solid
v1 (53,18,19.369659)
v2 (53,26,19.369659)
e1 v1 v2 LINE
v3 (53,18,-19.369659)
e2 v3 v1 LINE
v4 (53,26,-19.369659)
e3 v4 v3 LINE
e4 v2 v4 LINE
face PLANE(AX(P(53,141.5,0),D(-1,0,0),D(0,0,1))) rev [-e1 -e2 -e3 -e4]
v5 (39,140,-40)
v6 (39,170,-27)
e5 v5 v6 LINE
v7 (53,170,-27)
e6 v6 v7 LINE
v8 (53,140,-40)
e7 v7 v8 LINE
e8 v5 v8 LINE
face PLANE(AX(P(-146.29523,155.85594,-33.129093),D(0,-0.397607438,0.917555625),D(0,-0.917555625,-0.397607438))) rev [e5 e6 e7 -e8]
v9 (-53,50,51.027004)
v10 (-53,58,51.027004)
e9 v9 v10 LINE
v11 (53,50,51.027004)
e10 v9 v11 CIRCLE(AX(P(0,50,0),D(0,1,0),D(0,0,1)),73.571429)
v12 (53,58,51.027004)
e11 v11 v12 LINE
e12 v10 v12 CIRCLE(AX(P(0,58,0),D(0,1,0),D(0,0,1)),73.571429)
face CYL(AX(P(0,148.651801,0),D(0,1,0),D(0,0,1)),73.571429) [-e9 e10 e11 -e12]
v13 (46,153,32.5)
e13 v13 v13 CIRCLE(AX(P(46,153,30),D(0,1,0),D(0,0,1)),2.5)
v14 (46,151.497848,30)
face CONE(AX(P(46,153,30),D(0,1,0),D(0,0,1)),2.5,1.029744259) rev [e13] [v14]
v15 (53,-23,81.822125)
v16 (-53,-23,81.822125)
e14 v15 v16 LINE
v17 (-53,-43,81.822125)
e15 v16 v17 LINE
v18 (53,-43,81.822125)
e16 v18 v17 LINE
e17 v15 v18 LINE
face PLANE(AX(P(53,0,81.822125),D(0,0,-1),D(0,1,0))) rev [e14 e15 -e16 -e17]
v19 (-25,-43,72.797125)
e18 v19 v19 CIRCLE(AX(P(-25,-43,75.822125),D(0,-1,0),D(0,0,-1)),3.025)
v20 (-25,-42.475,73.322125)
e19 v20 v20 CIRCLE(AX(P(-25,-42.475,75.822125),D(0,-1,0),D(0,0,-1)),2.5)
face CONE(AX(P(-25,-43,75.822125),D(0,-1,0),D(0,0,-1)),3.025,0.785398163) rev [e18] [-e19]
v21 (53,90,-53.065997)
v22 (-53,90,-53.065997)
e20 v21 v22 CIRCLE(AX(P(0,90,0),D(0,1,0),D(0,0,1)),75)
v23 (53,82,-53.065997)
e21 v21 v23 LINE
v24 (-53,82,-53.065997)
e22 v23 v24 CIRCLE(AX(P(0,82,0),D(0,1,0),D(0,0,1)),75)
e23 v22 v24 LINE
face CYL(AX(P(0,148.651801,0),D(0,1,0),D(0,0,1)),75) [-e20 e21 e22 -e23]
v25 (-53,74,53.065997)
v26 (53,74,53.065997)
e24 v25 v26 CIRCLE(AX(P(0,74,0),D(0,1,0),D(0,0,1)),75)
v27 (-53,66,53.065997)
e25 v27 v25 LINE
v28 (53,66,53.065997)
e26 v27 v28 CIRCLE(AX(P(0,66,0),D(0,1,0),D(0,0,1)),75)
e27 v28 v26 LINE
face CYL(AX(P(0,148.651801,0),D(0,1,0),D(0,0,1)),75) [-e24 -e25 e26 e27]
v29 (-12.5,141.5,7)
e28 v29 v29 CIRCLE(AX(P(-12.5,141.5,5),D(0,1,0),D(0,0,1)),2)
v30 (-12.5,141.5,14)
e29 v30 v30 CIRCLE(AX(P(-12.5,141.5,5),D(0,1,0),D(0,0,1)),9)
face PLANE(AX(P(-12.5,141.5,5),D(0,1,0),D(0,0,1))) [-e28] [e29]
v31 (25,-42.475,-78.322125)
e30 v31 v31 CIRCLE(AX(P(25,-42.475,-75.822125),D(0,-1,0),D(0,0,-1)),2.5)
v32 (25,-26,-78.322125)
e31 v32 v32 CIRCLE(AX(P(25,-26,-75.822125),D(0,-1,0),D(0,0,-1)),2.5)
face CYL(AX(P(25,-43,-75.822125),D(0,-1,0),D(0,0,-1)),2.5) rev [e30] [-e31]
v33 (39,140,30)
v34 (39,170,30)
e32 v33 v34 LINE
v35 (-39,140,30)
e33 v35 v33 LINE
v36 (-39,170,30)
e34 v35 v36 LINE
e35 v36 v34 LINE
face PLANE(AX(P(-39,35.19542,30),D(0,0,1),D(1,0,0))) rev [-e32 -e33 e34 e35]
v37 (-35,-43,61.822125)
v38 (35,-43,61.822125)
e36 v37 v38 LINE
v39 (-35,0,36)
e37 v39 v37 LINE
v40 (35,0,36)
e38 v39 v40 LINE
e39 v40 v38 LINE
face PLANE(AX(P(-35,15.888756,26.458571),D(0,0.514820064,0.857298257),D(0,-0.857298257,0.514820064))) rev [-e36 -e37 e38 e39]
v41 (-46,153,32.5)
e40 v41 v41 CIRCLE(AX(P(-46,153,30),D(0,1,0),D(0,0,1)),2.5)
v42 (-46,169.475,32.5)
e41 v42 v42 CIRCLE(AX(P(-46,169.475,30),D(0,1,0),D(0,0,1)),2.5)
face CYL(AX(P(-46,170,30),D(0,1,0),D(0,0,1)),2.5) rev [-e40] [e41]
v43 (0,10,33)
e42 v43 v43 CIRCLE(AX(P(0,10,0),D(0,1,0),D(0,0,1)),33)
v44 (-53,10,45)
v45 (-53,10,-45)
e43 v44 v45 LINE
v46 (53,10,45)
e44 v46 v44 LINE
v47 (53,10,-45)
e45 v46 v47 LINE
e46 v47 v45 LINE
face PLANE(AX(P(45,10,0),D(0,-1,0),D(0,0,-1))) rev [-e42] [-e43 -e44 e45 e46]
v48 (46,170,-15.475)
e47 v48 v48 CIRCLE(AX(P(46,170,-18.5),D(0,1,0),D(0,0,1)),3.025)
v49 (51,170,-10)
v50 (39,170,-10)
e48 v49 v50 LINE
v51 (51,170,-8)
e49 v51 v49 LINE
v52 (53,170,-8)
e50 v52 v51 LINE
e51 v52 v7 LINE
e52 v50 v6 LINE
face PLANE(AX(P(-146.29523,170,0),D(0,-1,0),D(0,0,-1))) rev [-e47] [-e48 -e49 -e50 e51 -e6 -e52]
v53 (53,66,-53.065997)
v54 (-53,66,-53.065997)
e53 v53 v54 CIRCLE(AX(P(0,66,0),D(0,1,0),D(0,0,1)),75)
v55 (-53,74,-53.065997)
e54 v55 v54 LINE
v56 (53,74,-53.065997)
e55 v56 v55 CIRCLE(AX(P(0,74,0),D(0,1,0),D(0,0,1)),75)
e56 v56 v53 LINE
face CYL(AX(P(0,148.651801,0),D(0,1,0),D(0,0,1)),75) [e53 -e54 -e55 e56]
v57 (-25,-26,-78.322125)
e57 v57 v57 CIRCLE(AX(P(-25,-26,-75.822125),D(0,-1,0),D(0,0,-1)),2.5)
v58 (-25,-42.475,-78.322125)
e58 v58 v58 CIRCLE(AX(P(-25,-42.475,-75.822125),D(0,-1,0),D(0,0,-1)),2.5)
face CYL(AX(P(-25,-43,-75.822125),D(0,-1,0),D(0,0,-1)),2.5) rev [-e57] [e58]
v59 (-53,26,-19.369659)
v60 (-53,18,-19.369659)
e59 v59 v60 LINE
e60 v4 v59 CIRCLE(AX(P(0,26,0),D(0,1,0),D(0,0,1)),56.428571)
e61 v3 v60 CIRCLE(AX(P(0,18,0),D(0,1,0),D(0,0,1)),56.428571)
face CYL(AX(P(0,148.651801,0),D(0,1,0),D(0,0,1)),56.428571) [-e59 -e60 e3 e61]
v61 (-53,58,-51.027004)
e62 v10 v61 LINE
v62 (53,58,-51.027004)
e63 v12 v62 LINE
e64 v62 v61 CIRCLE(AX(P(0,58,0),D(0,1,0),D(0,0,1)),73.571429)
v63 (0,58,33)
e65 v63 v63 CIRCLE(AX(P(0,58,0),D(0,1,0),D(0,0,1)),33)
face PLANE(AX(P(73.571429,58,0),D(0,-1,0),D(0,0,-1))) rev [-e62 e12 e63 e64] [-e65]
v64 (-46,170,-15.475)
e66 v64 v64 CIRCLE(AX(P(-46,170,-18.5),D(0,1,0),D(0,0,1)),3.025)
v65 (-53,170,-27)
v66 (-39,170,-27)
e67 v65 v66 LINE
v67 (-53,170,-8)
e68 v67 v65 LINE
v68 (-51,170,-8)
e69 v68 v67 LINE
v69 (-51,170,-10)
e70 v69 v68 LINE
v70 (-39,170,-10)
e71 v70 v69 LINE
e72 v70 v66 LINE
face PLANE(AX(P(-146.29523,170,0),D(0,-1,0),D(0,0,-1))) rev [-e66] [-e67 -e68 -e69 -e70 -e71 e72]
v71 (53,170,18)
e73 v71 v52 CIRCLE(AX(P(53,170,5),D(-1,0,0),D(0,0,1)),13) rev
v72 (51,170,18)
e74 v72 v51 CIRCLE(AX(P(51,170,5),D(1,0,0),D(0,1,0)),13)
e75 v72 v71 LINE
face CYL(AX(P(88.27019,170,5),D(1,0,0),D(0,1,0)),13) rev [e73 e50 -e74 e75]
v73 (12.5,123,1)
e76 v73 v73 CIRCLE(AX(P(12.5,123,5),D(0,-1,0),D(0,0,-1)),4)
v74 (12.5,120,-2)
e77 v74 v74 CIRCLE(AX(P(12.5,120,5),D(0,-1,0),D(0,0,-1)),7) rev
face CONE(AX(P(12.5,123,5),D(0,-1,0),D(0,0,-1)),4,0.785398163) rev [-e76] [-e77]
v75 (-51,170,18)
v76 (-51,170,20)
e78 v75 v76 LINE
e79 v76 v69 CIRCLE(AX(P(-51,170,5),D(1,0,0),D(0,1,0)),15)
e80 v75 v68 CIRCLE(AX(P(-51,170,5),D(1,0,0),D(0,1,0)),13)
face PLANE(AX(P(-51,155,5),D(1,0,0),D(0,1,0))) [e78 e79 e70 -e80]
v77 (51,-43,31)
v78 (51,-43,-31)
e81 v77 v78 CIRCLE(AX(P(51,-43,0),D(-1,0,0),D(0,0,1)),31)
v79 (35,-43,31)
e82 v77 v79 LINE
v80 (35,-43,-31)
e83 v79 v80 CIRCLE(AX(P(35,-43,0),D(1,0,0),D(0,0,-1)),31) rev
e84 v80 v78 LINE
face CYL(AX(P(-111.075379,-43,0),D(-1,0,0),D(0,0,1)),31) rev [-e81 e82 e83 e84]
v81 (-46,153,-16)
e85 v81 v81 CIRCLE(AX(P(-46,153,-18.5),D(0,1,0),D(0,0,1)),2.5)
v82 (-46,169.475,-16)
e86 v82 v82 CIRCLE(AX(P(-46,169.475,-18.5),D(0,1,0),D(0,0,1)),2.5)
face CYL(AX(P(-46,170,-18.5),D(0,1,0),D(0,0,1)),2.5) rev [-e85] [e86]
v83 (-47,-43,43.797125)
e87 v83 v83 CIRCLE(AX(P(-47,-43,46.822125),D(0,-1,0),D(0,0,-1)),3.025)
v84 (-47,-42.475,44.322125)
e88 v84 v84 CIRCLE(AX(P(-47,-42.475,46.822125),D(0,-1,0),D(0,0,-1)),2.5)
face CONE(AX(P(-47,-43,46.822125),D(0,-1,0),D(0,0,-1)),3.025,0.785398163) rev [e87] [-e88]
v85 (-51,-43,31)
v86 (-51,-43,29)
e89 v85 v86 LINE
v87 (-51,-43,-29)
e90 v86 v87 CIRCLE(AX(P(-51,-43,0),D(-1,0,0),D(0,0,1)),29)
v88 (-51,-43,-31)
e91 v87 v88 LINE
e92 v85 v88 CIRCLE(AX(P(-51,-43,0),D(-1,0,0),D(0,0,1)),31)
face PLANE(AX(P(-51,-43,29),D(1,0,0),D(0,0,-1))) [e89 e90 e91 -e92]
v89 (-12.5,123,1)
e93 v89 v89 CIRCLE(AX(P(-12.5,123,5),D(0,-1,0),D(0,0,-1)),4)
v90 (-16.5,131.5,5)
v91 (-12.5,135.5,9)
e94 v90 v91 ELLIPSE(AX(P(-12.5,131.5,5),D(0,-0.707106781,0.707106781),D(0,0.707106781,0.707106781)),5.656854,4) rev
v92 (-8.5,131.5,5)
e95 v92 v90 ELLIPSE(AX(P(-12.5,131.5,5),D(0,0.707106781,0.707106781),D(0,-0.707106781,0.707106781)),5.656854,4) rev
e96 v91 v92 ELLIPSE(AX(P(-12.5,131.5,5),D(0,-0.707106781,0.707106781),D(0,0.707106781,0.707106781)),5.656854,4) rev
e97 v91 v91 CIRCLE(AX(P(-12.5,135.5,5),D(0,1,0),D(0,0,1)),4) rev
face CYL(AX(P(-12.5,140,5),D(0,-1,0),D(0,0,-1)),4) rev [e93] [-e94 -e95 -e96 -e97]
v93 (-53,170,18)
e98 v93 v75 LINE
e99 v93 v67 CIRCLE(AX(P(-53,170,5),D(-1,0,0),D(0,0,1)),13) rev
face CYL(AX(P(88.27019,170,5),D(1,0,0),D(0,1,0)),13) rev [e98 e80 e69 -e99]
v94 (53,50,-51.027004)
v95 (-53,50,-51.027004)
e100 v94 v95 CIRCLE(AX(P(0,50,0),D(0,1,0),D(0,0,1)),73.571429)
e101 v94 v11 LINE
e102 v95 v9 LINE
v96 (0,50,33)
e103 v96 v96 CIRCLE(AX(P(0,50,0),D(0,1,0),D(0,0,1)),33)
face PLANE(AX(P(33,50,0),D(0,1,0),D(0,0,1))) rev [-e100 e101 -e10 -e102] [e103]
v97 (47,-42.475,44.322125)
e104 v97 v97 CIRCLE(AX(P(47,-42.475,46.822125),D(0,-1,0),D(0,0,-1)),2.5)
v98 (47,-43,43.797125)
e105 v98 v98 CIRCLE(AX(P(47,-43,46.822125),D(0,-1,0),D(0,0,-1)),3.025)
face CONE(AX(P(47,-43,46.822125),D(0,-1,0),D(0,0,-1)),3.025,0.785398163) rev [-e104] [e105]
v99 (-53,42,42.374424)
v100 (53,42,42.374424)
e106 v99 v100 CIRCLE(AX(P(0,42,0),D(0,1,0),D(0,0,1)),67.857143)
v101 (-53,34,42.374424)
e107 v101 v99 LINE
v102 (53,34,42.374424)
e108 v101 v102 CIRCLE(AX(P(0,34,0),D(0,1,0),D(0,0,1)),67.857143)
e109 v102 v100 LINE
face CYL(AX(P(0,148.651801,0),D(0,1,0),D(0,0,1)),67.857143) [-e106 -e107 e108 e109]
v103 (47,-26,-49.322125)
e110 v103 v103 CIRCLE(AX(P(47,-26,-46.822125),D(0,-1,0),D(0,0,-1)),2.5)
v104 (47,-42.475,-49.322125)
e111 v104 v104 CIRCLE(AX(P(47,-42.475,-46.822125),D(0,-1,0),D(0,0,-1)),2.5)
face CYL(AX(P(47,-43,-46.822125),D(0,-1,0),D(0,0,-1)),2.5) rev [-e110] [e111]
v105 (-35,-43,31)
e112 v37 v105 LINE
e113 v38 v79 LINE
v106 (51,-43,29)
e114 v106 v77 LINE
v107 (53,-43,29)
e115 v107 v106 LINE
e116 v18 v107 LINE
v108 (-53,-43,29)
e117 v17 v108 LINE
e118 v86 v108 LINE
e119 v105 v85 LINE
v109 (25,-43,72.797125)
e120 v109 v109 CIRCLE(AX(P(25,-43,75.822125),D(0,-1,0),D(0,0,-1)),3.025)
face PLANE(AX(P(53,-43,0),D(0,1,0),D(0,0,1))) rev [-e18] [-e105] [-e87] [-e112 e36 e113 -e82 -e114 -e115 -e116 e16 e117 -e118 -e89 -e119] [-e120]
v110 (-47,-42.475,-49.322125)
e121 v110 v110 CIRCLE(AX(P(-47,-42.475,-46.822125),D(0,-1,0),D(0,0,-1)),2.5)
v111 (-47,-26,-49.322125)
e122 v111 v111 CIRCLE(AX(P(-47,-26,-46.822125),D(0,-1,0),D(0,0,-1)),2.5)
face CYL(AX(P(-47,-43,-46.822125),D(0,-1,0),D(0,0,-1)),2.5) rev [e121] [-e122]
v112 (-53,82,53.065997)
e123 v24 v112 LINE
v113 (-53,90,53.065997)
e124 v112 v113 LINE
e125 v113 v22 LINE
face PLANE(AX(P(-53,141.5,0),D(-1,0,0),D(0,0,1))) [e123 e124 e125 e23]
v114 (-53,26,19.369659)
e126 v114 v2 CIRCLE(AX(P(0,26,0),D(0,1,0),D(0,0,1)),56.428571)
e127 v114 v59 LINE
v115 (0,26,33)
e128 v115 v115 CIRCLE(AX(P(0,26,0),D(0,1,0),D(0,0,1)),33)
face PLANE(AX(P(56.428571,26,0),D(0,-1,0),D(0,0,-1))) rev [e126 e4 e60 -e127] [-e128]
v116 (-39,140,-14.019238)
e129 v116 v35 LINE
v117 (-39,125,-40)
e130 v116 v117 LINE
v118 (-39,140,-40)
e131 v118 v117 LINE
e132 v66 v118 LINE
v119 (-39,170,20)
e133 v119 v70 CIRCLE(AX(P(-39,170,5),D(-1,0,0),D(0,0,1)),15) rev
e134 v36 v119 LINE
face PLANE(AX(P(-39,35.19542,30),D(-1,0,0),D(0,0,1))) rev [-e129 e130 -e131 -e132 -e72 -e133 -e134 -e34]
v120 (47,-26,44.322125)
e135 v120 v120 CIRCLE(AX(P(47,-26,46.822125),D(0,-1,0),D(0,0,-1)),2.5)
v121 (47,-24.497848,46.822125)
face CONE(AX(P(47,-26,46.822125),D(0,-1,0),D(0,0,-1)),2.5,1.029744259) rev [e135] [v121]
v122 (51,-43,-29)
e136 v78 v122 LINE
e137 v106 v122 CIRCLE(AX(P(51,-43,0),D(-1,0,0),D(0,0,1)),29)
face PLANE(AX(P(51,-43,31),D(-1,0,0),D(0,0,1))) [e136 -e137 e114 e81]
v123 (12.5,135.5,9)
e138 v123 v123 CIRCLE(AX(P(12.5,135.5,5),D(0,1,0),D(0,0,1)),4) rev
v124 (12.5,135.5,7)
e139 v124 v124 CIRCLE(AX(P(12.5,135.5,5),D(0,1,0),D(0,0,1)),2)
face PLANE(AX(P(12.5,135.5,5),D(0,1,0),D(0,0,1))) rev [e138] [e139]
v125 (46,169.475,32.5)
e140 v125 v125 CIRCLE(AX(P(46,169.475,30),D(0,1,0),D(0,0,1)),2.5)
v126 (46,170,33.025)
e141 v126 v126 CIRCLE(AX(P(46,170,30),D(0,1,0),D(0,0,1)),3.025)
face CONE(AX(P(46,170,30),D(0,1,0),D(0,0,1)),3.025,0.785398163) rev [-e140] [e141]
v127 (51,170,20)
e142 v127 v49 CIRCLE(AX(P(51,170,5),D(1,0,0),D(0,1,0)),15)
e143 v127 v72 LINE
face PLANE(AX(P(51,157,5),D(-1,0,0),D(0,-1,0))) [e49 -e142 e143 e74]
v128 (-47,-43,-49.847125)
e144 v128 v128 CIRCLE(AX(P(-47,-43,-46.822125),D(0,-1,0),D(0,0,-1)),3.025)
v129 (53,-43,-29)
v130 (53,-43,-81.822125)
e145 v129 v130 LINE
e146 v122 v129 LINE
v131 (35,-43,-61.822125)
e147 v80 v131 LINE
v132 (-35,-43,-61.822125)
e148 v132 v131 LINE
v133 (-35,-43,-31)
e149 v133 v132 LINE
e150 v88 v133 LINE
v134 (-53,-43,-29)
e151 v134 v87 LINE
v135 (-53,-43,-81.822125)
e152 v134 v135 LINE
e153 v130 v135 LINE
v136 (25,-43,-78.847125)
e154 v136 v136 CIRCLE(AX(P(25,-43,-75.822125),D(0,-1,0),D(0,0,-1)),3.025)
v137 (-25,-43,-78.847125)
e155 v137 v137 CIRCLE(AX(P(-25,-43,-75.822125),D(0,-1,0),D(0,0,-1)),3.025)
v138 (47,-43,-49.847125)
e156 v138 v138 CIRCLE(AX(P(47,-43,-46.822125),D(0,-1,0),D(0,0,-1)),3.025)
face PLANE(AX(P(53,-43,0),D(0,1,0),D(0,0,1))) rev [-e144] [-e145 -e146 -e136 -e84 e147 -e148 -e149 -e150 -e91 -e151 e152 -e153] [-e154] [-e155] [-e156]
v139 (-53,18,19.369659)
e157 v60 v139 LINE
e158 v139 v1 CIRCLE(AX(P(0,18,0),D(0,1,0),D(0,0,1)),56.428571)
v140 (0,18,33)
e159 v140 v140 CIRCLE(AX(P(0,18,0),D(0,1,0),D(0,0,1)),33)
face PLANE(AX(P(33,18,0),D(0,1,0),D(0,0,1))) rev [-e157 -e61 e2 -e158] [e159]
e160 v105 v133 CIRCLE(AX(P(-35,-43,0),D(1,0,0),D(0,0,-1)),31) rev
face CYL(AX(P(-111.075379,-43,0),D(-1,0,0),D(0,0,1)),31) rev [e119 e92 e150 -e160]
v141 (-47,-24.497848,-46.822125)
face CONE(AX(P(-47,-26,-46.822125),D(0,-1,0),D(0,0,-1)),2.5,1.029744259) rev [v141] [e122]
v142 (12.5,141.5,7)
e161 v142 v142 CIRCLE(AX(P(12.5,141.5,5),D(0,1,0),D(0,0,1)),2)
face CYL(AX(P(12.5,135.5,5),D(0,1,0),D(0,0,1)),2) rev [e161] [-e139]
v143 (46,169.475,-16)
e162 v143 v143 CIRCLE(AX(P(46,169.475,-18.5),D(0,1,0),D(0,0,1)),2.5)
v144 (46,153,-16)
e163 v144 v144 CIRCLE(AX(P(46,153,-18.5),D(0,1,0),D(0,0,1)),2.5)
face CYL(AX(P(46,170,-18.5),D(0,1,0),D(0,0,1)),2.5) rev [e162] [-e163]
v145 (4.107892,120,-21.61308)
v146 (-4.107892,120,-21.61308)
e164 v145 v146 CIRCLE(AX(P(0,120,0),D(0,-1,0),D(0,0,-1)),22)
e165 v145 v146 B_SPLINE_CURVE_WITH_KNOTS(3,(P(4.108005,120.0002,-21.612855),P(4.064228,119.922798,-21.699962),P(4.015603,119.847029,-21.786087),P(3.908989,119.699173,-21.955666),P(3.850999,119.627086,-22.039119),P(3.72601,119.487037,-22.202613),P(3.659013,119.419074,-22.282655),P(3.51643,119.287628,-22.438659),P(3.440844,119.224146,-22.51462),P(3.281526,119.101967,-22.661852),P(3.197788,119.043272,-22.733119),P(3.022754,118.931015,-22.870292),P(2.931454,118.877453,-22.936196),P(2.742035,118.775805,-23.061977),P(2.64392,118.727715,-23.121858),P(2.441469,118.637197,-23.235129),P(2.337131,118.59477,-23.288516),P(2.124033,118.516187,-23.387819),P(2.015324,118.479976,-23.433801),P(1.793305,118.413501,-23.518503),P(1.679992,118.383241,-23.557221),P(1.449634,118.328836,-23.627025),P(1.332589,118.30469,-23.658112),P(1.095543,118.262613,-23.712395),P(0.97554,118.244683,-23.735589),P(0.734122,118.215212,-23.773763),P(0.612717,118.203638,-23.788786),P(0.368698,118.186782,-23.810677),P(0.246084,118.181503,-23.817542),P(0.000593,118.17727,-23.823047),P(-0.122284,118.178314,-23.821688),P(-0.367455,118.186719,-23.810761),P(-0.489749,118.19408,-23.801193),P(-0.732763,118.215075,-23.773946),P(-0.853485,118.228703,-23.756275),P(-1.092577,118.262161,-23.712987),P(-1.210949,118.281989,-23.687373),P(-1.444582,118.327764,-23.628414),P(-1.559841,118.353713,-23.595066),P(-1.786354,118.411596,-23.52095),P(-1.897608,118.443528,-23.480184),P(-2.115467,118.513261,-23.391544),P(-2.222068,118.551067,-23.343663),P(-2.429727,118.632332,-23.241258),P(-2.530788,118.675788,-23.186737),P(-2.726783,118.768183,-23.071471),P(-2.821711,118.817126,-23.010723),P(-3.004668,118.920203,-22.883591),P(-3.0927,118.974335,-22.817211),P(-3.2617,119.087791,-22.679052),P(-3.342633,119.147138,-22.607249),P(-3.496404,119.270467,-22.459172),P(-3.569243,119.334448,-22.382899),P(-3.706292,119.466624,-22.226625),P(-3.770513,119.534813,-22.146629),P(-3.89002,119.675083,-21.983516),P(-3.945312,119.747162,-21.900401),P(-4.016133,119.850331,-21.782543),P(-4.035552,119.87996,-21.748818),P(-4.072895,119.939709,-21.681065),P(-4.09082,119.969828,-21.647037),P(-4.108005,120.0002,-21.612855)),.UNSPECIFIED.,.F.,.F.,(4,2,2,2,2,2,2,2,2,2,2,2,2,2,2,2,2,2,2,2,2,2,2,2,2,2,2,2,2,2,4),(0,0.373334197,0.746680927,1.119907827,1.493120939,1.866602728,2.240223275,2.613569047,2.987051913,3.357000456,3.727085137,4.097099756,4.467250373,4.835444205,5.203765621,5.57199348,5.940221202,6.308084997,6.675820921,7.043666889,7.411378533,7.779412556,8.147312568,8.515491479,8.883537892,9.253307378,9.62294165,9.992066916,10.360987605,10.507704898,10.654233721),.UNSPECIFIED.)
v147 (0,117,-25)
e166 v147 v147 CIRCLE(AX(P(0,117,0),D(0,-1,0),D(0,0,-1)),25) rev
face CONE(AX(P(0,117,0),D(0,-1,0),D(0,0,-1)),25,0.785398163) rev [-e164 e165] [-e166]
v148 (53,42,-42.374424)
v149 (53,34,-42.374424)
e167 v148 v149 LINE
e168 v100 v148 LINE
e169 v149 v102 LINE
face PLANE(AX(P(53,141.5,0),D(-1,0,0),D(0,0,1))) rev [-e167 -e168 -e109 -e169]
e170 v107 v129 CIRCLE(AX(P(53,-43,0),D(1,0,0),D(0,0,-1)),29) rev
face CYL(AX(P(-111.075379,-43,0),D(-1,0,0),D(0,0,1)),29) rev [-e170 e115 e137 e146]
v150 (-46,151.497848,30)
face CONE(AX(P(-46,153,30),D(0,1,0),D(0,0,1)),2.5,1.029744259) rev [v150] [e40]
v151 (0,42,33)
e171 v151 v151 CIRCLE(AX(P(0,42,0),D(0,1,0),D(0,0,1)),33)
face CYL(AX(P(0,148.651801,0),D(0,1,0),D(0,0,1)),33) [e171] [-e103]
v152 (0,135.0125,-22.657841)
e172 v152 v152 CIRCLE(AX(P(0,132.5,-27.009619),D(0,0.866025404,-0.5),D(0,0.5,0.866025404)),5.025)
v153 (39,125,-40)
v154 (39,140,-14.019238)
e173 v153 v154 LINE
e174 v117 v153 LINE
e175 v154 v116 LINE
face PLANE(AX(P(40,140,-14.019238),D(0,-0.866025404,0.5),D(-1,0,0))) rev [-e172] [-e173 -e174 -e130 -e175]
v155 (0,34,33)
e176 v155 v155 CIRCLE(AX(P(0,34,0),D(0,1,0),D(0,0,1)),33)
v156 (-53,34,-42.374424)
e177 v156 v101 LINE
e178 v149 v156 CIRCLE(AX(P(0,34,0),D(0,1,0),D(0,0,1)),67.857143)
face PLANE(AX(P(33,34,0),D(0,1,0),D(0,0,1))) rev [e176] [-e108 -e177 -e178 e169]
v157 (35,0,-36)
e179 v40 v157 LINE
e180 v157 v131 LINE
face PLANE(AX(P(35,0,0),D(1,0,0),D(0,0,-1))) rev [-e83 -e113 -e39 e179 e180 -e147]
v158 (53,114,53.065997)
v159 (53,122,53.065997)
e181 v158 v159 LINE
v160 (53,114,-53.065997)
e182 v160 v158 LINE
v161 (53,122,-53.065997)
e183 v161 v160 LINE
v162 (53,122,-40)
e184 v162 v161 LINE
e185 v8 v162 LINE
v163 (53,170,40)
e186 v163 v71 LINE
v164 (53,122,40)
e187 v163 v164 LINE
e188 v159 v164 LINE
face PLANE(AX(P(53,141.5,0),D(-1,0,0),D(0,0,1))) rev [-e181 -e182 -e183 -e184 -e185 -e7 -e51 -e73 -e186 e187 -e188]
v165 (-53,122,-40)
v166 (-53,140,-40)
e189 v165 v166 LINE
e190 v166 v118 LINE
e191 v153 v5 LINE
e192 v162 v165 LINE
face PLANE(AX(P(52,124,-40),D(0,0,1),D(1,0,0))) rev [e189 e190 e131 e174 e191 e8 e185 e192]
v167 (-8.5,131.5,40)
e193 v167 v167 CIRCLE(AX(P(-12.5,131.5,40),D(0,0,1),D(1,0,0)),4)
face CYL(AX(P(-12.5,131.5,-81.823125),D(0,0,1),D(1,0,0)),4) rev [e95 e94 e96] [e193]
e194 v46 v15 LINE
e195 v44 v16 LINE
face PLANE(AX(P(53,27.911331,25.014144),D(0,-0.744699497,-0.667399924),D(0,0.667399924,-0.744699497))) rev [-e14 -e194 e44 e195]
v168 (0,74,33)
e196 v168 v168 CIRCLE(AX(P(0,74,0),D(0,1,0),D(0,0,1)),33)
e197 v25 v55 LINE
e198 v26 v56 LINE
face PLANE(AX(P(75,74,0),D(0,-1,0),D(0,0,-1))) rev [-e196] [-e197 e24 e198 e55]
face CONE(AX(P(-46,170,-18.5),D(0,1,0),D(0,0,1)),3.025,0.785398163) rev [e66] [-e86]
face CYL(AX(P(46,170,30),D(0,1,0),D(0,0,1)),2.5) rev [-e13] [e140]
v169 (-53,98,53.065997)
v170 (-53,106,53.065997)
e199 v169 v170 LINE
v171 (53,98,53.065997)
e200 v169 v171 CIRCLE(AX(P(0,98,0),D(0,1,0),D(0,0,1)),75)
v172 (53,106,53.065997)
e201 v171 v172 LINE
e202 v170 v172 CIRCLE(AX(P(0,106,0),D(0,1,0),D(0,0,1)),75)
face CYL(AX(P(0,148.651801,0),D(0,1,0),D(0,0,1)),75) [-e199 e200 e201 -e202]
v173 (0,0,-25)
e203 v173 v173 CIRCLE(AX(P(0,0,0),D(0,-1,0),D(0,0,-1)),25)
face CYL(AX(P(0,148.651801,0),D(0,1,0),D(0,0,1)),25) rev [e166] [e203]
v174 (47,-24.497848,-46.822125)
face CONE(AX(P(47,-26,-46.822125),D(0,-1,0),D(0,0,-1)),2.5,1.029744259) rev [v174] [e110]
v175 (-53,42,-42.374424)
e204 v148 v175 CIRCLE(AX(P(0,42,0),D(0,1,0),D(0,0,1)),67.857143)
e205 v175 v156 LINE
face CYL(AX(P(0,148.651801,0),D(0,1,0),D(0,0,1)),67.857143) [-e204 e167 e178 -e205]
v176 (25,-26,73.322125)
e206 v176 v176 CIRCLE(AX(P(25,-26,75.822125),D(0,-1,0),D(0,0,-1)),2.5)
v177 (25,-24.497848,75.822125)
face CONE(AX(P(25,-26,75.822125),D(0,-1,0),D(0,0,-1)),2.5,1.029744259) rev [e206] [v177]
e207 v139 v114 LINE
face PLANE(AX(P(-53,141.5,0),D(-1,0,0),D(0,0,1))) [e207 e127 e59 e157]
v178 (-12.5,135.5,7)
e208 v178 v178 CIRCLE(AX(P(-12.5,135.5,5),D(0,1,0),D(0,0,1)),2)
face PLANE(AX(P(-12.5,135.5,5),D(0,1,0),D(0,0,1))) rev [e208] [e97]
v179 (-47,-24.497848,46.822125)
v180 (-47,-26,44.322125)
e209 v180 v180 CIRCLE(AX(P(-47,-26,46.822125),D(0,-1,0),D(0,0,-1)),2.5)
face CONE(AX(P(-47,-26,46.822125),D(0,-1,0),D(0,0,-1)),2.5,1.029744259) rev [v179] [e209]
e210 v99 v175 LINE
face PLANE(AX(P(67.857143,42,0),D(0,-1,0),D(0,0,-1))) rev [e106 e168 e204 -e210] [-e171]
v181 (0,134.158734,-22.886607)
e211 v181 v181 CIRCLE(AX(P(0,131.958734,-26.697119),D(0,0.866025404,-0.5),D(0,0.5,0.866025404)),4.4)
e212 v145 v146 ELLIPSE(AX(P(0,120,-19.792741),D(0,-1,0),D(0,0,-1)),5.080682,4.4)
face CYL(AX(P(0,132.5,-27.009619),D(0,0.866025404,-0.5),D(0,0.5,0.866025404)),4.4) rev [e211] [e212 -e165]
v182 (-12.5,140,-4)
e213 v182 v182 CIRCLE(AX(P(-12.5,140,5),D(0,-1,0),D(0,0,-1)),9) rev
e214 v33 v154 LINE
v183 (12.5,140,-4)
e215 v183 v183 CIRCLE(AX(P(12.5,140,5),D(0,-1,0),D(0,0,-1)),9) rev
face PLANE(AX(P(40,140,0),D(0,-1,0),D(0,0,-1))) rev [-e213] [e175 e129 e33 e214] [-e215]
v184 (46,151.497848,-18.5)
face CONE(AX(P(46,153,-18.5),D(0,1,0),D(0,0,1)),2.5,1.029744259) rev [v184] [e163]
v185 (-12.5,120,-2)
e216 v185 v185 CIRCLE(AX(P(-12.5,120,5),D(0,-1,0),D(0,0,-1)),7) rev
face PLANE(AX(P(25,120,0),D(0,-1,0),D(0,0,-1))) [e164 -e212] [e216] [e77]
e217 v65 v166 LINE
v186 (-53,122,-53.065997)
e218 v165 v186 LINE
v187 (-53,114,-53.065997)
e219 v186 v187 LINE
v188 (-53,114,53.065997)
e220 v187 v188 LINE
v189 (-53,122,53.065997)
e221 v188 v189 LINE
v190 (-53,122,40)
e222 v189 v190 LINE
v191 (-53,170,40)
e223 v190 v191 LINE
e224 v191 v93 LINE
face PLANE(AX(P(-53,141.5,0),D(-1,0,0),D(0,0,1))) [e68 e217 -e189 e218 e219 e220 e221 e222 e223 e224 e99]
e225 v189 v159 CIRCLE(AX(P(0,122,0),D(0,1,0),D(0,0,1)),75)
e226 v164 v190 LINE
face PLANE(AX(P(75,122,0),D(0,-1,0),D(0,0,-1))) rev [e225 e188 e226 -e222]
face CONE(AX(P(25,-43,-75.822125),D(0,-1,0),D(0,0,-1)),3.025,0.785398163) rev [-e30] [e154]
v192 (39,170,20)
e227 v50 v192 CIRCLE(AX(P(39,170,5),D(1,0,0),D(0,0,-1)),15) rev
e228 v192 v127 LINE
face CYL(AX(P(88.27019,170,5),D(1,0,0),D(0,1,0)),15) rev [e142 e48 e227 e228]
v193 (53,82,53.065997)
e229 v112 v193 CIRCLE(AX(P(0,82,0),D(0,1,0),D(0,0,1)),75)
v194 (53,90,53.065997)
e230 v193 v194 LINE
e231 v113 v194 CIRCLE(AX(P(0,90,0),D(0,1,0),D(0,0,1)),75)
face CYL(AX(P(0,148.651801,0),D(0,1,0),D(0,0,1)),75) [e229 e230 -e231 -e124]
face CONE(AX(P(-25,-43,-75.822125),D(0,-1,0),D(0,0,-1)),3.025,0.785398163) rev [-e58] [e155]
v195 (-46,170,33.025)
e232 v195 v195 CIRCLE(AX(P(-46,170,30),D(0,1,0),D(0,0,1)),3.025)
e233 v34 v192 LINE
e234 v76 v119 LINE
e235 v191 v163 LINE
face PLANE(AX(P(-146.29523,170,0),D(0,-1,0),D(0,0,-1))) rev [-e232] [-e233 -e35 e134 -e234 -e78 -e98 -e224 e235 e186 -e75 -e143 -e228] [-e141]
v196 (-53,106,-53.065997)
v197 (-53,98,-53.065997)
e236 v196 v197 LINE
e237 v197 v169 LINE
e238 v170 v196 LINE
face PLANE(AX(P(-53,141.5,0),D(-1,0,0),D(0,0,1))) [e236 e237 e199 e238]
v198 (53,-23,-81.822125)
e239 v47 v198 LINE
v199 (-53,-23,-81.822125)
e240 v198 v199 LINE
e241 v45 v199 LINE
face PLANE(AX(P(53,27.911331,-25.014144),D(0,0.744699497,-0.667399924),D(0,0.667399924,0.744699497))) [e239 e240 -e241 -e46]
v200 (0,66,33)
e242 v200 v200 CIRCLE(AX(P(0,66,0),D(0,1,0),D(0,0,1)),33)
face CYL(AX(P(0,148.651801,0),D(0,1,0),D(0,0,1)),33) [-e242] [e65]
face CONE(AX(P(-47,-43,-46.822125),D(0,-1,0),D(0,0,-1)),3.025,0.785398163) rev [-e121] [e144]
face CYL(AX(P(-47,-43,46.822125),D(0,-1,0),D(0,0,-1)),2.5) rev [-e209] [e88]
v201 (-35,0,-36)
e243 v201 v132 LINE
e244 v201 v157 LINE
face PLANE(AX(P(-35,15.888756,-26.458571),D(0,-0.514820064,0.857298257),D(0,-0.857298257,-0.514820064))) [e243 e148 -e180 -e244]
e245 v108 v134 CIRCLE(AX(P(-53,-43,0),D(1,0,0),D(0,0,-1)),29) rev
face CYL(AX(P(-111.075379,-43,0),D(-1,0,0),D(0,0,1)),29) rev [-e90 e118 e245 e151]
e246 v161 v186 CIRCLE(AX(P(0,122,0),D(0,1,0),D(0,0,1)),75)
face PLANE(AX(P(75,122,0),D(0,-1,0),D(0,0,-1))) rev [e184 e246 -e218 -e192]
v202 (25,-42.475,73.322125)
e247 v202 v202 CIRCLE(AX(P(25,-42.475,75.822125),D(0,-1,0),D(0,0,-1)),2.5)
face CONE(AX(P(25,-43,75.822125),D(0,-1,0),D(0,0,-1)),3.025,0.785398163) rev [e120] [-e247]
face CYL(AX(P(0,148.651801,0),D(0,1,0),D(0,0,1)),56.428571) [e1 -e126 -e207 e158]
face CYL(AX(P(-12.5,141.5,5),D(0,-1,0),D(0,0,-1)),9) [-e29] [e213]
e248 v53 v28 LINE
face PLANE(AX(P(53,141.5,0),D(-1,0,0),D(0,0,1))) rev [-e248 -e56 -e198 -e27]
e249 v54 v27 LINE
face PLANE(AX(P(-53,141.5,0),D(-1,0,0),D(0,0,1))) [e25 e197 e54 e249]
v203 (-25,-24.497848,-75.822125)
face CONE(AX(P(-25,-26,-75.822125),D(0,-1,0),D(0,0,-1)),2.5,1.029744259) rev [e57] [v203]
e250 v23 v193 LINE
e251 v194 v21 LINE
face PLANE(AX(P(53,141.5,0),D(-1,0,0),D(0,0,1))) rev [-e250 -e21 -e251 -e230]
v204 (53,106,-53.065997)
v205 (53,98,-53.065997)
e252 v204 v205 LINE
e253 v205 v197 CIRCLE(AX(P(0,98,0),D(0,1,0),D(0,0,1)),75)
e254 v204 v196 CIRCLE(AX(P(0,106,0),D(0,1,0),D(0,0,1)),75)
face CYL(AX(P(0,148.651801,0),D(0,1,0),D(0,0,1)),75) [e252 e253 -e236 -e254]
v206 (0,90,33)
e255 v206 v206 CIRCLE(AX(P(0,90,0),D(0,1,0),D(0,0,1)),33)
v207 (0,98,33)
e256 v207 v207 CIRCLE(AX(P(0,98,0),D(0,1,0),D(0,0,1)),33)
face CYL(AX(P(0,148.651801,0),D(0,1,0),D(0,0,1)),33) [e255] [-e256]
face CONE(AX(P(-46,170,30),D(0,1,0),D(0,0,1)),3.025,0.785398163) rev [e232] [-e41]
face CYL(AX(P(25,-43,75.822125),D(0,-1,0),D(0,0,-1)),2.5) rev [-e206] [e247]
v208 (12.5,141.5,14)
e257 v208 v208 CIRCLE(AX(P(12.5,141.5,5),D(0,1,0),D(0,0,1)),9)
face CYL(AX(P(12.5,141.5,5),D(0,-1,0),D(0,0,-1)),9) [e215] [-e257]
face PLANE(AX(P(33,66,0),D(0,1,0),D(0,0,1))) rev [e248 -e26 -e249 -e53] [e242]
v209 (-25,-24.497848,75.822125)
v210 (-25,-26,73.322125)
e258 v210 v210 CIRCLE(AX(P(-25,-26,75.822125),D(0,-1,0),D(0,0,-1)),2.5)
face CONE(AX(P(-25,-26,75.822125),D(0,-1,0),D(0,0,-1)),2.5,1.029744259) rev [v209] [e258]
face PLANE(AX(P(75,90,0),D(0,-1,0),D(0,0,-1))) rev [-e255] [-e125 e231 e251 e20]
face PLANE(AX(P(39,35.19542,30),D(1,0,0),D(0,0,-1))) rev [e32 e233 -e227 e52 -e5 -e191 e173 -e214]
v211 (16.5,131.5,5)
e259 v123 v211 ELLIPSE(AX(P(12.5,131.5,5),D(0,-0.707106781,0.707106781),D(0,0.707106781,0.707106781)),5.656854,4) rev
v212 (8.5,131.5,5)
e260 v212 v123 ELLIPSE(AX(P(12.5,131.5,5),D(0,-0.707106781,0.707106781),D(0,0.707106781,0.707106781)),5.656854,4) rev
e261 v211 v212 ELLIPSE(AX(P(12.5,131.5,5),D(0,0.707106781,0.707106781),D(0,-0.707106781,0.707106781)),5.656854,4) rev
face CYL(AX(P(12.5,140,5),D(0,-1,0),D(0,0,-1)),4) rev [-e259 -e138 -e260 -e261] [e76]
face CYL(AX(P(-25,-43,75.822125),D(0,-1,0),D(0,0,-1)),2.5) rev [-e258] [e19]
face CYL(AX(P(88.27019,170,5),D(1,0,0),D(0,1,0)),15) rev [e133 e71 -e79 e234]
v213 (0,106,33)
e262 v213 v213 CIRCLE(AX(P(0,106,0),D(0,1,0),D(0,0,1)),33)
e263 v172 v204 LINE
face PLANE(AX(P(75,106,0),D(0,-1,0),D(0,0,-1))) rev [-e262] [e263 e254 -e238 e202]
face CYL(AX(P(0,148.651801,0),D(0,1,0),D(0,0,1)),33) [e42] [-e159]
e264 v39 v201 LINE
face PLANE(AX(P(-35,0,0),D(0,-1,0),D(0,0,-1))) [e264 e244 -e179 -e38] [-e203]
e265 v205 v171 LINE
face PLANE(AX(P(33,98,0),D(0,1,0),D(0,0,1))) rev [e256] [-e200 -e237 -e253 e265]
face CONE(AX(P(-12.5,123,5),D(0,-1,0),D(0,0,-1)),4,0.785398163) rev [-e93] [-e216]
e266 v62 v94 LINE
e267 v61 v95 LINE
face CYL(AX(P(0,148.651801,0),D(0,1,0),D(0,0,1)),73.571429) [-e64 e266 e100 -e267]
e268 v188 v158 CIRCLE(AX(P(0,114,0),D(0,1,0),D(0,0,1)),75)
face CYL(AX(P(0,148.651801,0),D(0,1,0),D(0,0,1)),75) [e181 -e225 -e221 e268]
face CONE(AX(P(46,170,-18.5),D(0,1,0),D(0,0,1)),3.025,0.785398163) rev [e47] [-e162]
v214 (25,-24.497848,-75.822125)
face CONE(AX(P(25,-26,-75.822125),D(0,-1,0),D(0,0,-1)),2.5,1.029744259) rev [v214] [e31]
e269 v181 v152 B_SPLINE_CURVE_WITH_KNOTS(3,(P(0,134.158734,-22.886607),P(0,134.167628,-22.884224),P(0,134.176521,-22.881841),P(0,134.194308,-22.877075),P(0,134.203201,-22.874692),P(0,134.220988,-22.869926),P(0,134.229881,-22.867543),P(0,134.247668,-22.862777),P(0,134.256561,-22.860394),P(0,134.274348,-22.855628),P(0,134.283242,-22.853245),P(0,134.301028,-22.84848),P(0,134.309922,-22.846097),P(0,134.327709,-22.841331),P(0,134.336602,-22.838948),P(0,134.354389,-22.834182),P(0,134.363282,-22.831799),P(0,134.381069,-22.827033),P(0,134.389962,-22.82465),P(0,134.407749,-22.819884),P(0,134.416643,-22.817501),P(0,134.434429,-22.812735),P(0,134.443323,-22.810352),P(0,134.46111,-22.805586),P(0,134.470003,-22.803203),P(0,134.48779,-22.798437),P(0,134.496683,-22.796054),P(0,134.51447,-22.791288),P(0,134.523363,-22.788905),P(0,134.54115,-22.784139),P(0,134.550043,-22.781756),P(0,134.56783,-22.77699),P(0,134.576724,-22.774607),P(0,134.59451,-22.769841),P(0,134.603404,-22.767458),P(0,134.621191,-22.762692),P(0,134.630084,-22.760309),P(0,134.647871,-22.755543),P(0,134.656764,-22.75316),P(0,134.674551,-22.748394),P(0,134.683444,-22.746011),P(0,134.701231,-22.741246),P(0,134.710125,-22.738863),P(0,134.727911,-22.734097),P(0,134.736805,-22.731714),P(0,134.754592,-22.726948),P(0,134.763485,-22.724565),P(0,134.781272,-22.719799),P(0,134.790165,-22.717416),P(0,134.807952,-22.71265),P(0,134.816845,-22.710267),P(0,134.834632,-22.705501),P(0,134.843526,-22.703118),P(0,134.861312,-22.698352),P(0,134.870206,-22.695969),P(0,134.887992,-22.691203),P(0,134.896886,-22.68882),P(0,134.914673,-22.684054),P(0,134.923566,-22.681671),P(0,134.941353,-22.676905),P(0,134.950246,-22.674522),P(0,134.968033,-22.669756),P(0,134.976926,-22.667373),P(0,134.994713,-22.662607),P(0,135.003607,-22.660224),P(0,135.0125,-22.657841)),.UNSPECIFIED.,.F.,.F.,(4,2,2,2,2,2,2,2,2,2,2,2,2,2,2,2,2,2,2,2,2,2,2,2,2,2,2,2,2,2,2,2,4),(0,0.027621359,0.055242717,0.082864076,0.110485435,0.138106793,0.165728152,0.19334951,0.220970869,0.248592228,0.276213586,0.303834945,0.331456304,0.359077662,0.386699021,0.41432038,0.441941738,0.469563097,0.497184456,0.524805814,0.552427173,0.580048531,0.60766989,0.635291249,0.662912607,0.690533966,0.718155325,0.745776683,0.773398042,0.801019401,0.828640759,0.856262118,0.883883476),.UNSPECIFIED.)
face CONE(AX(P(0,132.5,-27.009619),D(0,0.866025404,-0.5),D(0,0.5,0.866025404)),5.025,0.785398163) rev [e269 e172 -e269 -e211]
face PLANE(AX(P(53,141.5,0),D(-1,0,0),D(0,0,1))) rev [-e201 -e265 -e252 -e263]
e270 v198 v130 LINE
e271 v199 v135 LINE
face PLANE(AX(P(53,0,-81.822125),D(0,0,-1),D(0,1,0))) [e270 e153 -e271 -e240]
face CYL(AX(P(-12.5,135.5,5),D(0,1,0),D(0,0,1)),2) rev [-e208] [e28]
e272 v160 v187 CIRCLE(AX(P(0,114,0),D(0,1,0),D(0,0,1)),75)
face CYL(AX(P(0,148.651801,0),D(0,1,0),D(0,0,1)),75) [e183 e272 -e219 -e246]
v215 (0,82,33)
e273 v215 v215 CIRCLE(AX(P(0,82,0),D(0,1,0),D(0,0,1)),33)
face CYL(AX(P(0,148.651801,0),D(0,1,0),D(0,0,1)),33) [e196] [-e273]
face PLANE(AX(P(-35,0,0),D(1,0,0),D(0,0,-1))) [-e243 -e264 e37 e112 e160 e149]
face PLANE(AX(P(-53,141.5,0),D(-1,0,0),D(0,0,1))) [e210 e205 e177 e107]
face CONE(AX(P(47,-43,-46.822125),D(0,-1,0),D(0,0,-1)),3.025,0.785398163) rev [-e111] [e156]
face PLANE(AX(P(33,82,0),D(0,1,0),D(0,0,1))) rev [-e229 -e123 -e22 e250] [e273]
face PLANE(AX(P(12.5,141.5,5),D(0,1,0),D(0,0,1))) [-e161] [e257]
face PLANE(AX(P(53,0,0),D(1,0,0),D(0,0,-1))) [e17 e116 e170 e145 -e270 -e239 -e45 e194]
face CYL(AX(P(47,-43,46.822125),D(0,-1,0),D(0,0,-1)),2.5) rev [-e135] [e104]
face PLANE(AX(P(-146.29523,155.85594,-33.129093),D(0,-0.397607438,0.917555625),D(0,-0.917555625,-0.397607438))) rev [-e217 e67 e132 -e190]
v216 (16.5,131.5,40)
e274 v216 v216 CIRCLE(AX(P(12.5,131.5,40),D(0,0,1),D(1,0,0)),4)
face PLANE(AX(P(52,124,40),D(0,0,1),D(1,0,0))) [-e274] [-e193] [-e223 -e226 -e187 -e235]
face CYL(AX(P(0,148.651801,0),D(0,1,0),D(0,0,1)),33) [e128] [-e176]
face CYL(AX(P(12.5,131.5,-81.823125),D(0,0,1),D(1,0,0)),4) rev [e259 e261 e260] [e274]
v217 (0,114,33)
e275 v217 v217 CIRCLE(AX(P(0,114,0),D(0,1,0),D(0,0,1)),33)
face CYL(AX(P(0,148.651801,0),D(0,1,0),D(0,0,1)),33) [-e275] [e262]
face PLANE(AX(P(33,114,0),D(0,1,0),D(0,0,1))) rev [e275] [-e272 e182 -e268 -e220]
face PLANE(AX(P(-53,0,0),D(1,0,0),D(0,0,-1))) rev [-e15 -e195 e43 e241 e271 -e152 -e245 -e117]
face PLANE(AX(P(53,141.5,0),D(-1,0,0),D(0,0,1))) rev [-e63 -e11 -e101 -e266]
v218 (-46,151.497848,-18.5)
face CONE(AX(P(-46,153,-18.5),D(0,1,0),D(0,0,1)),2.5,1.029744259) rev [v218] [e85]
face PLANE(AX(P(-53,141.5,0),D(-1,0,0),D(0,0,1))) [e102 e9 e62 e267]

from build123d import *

# Parameters (mm, degrees)
SKICA4_R                    = 4
ODEBRAT_VYSUNUT_M1_DEPTH    = 161.15617378
SKICA5_R                    = 9
SKICA5_R_2                  = 4
P_IDAT_VYSUNUT_M1_DEPTH     = 1.5
SKICA6_W                    = 90
SKICA6_H                    = 10
P_IDAT_VYSUNUT_M3_DEPTH     = 53
ODEBRAT_VYSUNUT_M2_DEPTH    = 35
SKICA7_R                    = 25
ODEBRAT_VYSUNUT_M3_DEPTH    = 173.081696102
SKICA9_W                    = 47
SKICA9_H                    = 81.822124963
ODEBRAT_VYSUNUT_M4_DEPTH    = 216.313980348
M6_Z_VIT1_D                 = 5
M6_Z_VIT1_DEPTH             = 17
M6_Z_VIT1_CSINK_D           = 6.05
M6_Z_VIT1_CSINK_ANGLE       = 90
M6_Z_VIT1_TIP               = 1.502151548
P_IDAT_START                = -53
P_IDAT_VYSUNUT_M4_DEPTH     = 106
SKICA14_W                   = 78
SKICA14_H                   = 70
ODEBRAT_VYSUNUT_M5_DEPTH    = 30
SKICA15_R                   = 4
ODEBRAT_VYSUNUT_M6_DEPTH    = 208.347197072
SKICA16_W                   = 80
SKICA16_H                   = 4
P_IDAT_VYSUNUT_M5_DEPTH     = 1
ZKOSEN_4_SIZE               = 3
ZKOSEN_2_SIZE               = 15
ZKOSEN_2_SIZE2              = 25.980762114
ZKOSEN_3_SIZE               = 3
M10X1_25_Z_VIT1_D           = 8.8
M10X1_25_Z_VIT1_DEPTH       = 26.25
M10X1_25_Z_VIT1_CSINK_D     = 10.05
M10X1_25_Z_VIT1_CSINK_ANGLE = 90
M10X1_25_Z_VIT1_TIP         = 2.643786724
ODEBRAT_VYSUNUT_M7_REACH    = 217.754
SKICA25_R                   = 4
SKICA26_R                   = 9
SKICA26_R_2                 = 2
P_IDAT_VYSUNUT_M6_DEPTH     = 6


# Read off the part's stored shape, not the designer's step: Přidat vysunutím4, M6 závit2
with BuildPart() as part:
    # Skica2 → Rotovat1 (revolve)
    with BuildSketch(Plane.XY, mode=Mode.PRIVATE) as rotovat1_sk:
        Polygon((25, 0), (45, 0), (45, 10), (33, 10), (33, 18), (56.428571429, 18), (56.428571429, 26), (33, 26), (33, 34), (67.857142857, 34), (67.857142857, 42), (33, 42), (33, 50), (73.571428571, 50), (73.571428571, 58), (33, 58), (33, 66), (75, 66), (75, 74), (33, 74), (33, 82), (75, 82), (75, 90), (33, 90), (33, 98), (75, 98), (75, 106), (33, 106), (33, 114), (75, 114), (75, 122), (40, 122), (40, 140), (0, 140), (0, 120), (25, 120), align=None)
    revolve(rotovat1_sk.sketch.rotate(Axis((0, 148.651800879, 0), (0, -1, 0)), 90), axis=Axis((0, 148.651800879, 0), (0, -1, 0)))

    # Skica4 → Odebrat vysunutím1 (cut, through all)
    with BuildSketch(Plane.XZ.offset(-120)):
        with Locations(Location((12.5, 5, 0), (0, 0, 270))):
            Circle(SKICA4_R)
        with Locations(Location((-12.5, 5, 0), (0, 0, 270))):
            Circle(SKICA4_R)
    extrude(amount=-ODEBRAT_VYSUNUT_M1_DEPTH, mode=Mode.SUBTRACT)

    # Skica5 → Přidat vysunutím1 (add, symmetric)
    # profile 1 of 2: a face of its own
    with BuildSketch(Plane(origin=(0, 140, 0), x_dir=(1, 0, 0), z_dir=(0, 1, 0))):
        with Locations(Location((-12.5, -5, 0), (0, 0, 90))):
            Circle(SKICA5_R)
        with Locations(Location((-12.5, -5, 0), (0, 0, 90))):
            Circle(SKICA5_R_2, mode=Mode.SUBTRACT)
    # profile 2 of 2: a face of its own
    with BuildSketch(Plane(origin=(0, 140, 0), x_dir=(1, 0, 0), z_dir=(0, 1, 0))):
        with Locations(Location((12.5, -5, 0), (0, 0, 90))):
            Circle(SKICA5_R)
        with Locations(Location((12.5, -5, 0), (0, 0, 90))):
            Circle(SKICA5_R_2, mode=Mode.SUBTRACT)
    extrude(amount=P_IDAT_VYSUNUT_M1_DEPTH, both=True)

    # Skica6 → Přidat vysunutím3 (add, symmetric)
    with BuildSketch(Plane(origin=(0, 0, 0), x_dir=(0, 0, -1), z_dir=(1, 0, 0))):
        with Locations((0, 5)):
            Rectangle(SKICA6_W, SKICA6_H)
        Polygon((-45, 0), (-45, 10), (-81.822124963, -23), (-81.822124963, -43), (-61.822124963, -43), (-36, 0), align=None)
        Polygon((36, 0), (-36, 0), (-61.822124963, -43), (61.822124963, -43), align=None)
        Polygon((81.822124963, -23), (45, 10), (45, 0), (36, 0), (61.822124963, -43), (81.822124963, -43), align=None)
    extrude(amount=P_IDAT_VYSUNUT_M3_DEPTH, both=True)

    # Skica6<5> → Odebrat vysunutím2 (cut, symmetric)
    with BuildSketch(Plane(origin=(0, 0, 0), x_dir=(0, 0, -1), z_dir=(1, 0, 0))):
        Polygon((36, 0), (-36, 0), (-61.822124963, -43), (61.822124963, -43), align=None)
    extrude(amount=ODEBRAT_VYSUNUT_M2_DEPTH, both=True, mode=Mode.SUBTRACT)

    # Skica7 → Odebrat vysunutím3 (cut, through all)
    with BuildSketch(Plane(origin=(0, 10, 0), x_dir=(1, 0, 0), z_dir=(0, 1, 0))):
        with Locations(Location((0, 0, 0), (0, 0, 270))):
            Circle(SKICA7_R)
    extrude(amount=-ODEBRAT_VYSUNUT_M3_DEPTH, mode=Mode.SUBTRACT)

    # Skica8 → Odebrat rotací1 (revolve, cut)
    with BuildSketch(Plane.XZ.offset(43)):
        Polygon((-73, 0), (-73, 29), (-51, 29), (-51, 31), (51, 31), (51, 29), (73, 29), (73, 0), align=None)
    revolve(axis=Axis((-111.075378668, -43, 0), (1, 0, 0)), mode=Mode.SUBTRACT)

    # Skica9 → Odebrat vysunutím4 (cut, through all)
    with BuildSketch(Plane.XZ.offset(43)):
        Polygon((-100, 81.822124963), (-100, 0), (-53, 0), (-53, 29), (-53, 81.822124963), align=None)
        with Locations((-76.5, -40.911062482)):
            Rectangle(SKICA9_W, SKICA9_H)
        with Locations((76.5, -40.911062482)):
            Rectangle(SKICA9_W, SKICA9_H)
        Polygon((53, 29), (53, 0), (100, 0), (100, 81.822124963), (53, 81.822124963), align=None)
    extrude(amount=-ODEBRAT_VYSUNUT_M4_DEPTH, mode=Mode.SUBTRACT)

    # M6 závit1
    with Locations(Plane(origin=(0, -43, 0), x_dir=(-1, 0, 0), z_dir=(0, -1, 0))):
        with Locations((-47, 46.822124963), (-25, 75.822124963), (25, -75.822124963), (47, -46.822124963), (25, 75.822124963), (-25, -75.822124963), (-47, -46.822124963), (47, 46.822124963)):
            CounterSinkHole(M6_Z_VIT1_D / 2, M6_Z_VIT1_CSINK_D / 2, depth=M6_Z_VIT1_DEPTH, counter_sink_angle=M6_Z_VIT1_CSINK_ANGLE)
            with Locations((0, 0, -(M6_Z_VIT1_DEPTH + M6_Z_VIT1_TIP / 2))):  # 118° drill point
                Cone(0, M6_Z_VIT1_D / 2, M6_Z_VIT1_TIP, mode=Mode.SUBTRACT)



with BuildPart() as body_2:
    # Přidat vysunutím4 outline → Přidat vysunutím4 (new body)
    with BuildSketch(Plane(origin=(0, 0, 0), x_dir=(0, 0, -1), z_dir=(1, 0, 0)).offset(P_IDAT_START)):
        Polygon((40, 140), (27, 170), (-40, 170), (-40, 122), (40, 122), align=None)
    extrude(amount=P_IDAT_VYSUNUT_M4_DEPTH)

    # Skica14 → Odebrat vysunutím5 (cut)
    with BuildSketch(Plane(origin=(0, 170, 0), x_dir=(1, 0, 0), z_dir=(0, 1, 0))):
        with Locations((0, 5)):
            Rectangle(SKICA14_W, SKICA14_H)
    extrude(amount=-ODEBRAT_VYSUNUT_M5_DEPTH, mode=Mode.SUBTRACT)

    # Skica15 → Odebrat vysunutím6 (cut, through all)
    with BuildSketch(Plane(origin=(0, 140, 0), x_dir=(1, 0, 0), z_dir=(0, 1, 0))):
        with Locations(Location((12.5, -5, 0), (0, 0, 90))):
            Circle(SKICA15_R)
        with Locations(Location((-12.5, -5, 0), (0, 0, 90))):
            Circle(SKICA15_R)
    extrude(amount=-ODEBRAT_VYSUNUT_M6_DEPTH, mode=Mode.SUBTRACT)


with BuildPart() as part_1:
    add(part.part)

    add(body_2.part)  # Přidat vysunutím5 merges body 2
    # Skica16 → Přidat vysunutím5 (add)
    with BuildSketch(Plane(origin=(53, 0, 0), x_dir=(0, 0, -1), z_dir=(1, 0, 0))):
        with Locations((0, 122)):
            Rectangle(SKICA16_W, SKICA16_H)
    extrude(amount=-P_IDAT_VYSUNUT_M5_DEPTH)

    # Zkosení4
    zkosen_4_edges = [part_1.edges().sort_by_distance(p)[0] for p in [
        (-12.5, 120, 9),
        (12.5, 120, 9),
    ]]
    chamfer(zkosen_4_edges, length=ZKOSEN_4_SIZE)

    # Skica17 → Odebrat rotací2 (revolve, cut)
    with BuildSketch(Plane(origin=(0, 0, 5), x_dir=(0, -1, 0), z_dir=(0, 0, 1))):
        Polygon((-170, 58), (-157, 58), (-157, 51), (-155, 51), (-155, -51), (-157, -51), (-157, -58), (-170, -58), align=None)
    revolve(axis=Axis((88.270190347, 170, 5), (-1, 0, 0)), mode=Mode.SUBTRACT)

    # M6 závit2 outline → M6 závit2 (revolve, cut)
    with BuildSketch(Plane(origin=(46, 0, -18.5), x_dir=(1, 0, 0), z_dir=(0, 0, 1))):
        Polygon((0, 170), (0, 151.497848452), (2.5, 153), (2.5, 169.475), (3.025, 170), align=None)
    revolve(axis=Axis((46, 0, -18.5), (0, 1, 0)), mode=Mode.SUBTRACT)

    # M6 z_vit2 2 outline → M6 z_vit2 2 (revolve, cut)
    with BuildSketch(Plane(origin=(-46, 0, 30), x_dir=(1, 0, 0), z_dir=(0, 0, 1))):
        Polygon((0, 170), (0, 151.497848452), (2.5, 153), (2.5, 169.475), (3.025, 170), align=None)
    revolve(axis=Axis((-46, 0, 30), (0, 1, 0)), mode=Mode.SUBTRACT)

    # M6 z_vit2 3 outline → M6 z_vit2 3 (revolve, cut)
    with BuildSketch(Plane(origin=(46, 0, 30), x_dir=(1, 0, 0), z_dir=(0, 0, 1))):
        Polygon((0, 170), (0, 151.497848452), (2.5, 153), (2.5, 169.475), (3.025, 170), align=None)
    revolve(axis=Axis((46, 0, 30), (0, 1, 0)), mode=Mode.SUBTRACT)

    # M6 z_vit2 4 outline → M6 z_vit2 4 (revolve, cut)
    with BuildSketch(Plane(origin=(-46, 0, -18.5), x_dir=(1, 0, 0), z_dir=(0, 0, 1))):
        Polygon((0, 170), (0, 151.497848452), (2.5, 153), (2.5, 169.475), (3.025, 170), align=None)
    revolve(axis=Axis((-46, 0, -18.5), (0, 1, 0)), mode=Mode.SUBTRACT)

    # Zkosení2
    zkosen_2_edges = [part_1.edges().sort_by_distance(p)[0] for p in [
        (0, 140, -40),
    ]]
    zkosen_2_side = [part_1.faces().sort_by_distance(p)[0] for p in [
        (0, 131, -40),
    ]]
    chamfer(zkosen_2_edges, length=ZKOSEN_2_SIZE, length2=ZKOSEN_2_SIZE2, reference=zkosen_2_side[0])

    # Zkosení3
    zkosen_3_edges = [part_1.edges().sort_by_distance(p)[0] for p in [
        (0, 120, -25),
    ]]
    chamfer(zkosen_3_edges, length=ZKOSEN_3_SIZE)

    # M10x1.25 závit1
    with Locations(Plane(origin=(0, 111.070508076, -64.126587737), x_dir=(1, 0, 0), z_dir=(0, 0.8660254037844383, -0.5000000000000007))):
        with Locations((0, -42.858983849)):
            CounterSinkHole(M10X1_25_Z_VIT1_D / 2, M10X1_25_Z_VIT1_CSINK_D / 2, depth=M10X1_25_Z_VIT1_DEPTH, counter_sink_angle=M10X1_25_Z_VIT1_CSINK_ANGLE)
            with Locations((0, 0, -(M10X1_25_Z_VIT1_DEPTH + M10X1_25_Z_VIT1_TIP / 2))):  # 118° drill point
                Cone(0, M10X1_25_Z_VIT1_D / 2, M10X1_25_Z_VIT1_TIP, mode=Mode.SUBTRACT)

    # Skica25 → Odebrat vysunutím7 (cut, up to next)
    with BuildSketch(Plane.XY.offset(40), mode=Mode.PRIVATE) as odebrat_vysunut_m7_sk1:
        with Locations((-12.5, 131.5)):
            Circle(SKICA25_R)
    odebrat_vysunut_m7_tool1 = extrude(odebrat_vysunut_m7_sk1.sketch, amount=-ODEBRAT_VYSUNUT_M7_REACH, mode=Mode.PRIVATE) & part_1.part
    # Skica25 → Odebrat vysunutím7 (cut, up to next)
    with BuildSketch(Plane.XY.offset(40), mode=Mode.PRIVATE) as odebrat_vysunut_m7_sk2:
        with Locations((12.5, 131.5)):
            Circle(SKICA25_R)
    odebrat_vysunut_m7_tool2 = extrude(odebrat_vysunut_m7_sk2.sketch, amount=-ODEBRAT_VYSUNUT_M7_REACH, mode=Mode.PRIVATE) & part_1.part
    add(odebrat_vysunut_m7_tool1.solids().sort_by_distance((-12.5, 131.5, 40))[0], mode=Mode.SUBTRACT)
    add(odebrat_vysunut_m7_tool2.solids().sort_by_distance((12.5, 131.5, 40))[0], mode=Mode.SUBTRACT)

    # Skica26 → Přidat vysunutím6 (add)
    # profile 1 of 2: a face of its own
    with BuildSketch(Plane(origin=(0, 141.5, 0), x_dir=(1, 0, 0), z_dir=(0, 1, 0))):
        with Locations(Location((-12.5, -5, 0), (0, 0, 90))):
            Circle(SKICA26_R)
        with Locations(Location((-12.5, -5, 0), (0, 0, 270))):
            Circle(SKICA26_R_2, mode=Mode.SUBTRACT)
    # profile 2 of 2: a face of its own
    with BuildSketch(Plane(origin=(0, 141.5, 0), x_dir=(1, 0, 0), z_dir=(0, 1, 0))):
        with Locations(Location((12.5, -5, 0), (0, 0, 90))):
            Circle(SKICA26_R)
        with Locations(Location((12.5, -5, 0), (0, 0, 270))):
            Circle(SKICA26_R_2, mode=Mode.SUBTRACT)
    extrude(amount=-P_IDAT_VYSUNUT_M6_DEPTH)


solid = part_1.part
